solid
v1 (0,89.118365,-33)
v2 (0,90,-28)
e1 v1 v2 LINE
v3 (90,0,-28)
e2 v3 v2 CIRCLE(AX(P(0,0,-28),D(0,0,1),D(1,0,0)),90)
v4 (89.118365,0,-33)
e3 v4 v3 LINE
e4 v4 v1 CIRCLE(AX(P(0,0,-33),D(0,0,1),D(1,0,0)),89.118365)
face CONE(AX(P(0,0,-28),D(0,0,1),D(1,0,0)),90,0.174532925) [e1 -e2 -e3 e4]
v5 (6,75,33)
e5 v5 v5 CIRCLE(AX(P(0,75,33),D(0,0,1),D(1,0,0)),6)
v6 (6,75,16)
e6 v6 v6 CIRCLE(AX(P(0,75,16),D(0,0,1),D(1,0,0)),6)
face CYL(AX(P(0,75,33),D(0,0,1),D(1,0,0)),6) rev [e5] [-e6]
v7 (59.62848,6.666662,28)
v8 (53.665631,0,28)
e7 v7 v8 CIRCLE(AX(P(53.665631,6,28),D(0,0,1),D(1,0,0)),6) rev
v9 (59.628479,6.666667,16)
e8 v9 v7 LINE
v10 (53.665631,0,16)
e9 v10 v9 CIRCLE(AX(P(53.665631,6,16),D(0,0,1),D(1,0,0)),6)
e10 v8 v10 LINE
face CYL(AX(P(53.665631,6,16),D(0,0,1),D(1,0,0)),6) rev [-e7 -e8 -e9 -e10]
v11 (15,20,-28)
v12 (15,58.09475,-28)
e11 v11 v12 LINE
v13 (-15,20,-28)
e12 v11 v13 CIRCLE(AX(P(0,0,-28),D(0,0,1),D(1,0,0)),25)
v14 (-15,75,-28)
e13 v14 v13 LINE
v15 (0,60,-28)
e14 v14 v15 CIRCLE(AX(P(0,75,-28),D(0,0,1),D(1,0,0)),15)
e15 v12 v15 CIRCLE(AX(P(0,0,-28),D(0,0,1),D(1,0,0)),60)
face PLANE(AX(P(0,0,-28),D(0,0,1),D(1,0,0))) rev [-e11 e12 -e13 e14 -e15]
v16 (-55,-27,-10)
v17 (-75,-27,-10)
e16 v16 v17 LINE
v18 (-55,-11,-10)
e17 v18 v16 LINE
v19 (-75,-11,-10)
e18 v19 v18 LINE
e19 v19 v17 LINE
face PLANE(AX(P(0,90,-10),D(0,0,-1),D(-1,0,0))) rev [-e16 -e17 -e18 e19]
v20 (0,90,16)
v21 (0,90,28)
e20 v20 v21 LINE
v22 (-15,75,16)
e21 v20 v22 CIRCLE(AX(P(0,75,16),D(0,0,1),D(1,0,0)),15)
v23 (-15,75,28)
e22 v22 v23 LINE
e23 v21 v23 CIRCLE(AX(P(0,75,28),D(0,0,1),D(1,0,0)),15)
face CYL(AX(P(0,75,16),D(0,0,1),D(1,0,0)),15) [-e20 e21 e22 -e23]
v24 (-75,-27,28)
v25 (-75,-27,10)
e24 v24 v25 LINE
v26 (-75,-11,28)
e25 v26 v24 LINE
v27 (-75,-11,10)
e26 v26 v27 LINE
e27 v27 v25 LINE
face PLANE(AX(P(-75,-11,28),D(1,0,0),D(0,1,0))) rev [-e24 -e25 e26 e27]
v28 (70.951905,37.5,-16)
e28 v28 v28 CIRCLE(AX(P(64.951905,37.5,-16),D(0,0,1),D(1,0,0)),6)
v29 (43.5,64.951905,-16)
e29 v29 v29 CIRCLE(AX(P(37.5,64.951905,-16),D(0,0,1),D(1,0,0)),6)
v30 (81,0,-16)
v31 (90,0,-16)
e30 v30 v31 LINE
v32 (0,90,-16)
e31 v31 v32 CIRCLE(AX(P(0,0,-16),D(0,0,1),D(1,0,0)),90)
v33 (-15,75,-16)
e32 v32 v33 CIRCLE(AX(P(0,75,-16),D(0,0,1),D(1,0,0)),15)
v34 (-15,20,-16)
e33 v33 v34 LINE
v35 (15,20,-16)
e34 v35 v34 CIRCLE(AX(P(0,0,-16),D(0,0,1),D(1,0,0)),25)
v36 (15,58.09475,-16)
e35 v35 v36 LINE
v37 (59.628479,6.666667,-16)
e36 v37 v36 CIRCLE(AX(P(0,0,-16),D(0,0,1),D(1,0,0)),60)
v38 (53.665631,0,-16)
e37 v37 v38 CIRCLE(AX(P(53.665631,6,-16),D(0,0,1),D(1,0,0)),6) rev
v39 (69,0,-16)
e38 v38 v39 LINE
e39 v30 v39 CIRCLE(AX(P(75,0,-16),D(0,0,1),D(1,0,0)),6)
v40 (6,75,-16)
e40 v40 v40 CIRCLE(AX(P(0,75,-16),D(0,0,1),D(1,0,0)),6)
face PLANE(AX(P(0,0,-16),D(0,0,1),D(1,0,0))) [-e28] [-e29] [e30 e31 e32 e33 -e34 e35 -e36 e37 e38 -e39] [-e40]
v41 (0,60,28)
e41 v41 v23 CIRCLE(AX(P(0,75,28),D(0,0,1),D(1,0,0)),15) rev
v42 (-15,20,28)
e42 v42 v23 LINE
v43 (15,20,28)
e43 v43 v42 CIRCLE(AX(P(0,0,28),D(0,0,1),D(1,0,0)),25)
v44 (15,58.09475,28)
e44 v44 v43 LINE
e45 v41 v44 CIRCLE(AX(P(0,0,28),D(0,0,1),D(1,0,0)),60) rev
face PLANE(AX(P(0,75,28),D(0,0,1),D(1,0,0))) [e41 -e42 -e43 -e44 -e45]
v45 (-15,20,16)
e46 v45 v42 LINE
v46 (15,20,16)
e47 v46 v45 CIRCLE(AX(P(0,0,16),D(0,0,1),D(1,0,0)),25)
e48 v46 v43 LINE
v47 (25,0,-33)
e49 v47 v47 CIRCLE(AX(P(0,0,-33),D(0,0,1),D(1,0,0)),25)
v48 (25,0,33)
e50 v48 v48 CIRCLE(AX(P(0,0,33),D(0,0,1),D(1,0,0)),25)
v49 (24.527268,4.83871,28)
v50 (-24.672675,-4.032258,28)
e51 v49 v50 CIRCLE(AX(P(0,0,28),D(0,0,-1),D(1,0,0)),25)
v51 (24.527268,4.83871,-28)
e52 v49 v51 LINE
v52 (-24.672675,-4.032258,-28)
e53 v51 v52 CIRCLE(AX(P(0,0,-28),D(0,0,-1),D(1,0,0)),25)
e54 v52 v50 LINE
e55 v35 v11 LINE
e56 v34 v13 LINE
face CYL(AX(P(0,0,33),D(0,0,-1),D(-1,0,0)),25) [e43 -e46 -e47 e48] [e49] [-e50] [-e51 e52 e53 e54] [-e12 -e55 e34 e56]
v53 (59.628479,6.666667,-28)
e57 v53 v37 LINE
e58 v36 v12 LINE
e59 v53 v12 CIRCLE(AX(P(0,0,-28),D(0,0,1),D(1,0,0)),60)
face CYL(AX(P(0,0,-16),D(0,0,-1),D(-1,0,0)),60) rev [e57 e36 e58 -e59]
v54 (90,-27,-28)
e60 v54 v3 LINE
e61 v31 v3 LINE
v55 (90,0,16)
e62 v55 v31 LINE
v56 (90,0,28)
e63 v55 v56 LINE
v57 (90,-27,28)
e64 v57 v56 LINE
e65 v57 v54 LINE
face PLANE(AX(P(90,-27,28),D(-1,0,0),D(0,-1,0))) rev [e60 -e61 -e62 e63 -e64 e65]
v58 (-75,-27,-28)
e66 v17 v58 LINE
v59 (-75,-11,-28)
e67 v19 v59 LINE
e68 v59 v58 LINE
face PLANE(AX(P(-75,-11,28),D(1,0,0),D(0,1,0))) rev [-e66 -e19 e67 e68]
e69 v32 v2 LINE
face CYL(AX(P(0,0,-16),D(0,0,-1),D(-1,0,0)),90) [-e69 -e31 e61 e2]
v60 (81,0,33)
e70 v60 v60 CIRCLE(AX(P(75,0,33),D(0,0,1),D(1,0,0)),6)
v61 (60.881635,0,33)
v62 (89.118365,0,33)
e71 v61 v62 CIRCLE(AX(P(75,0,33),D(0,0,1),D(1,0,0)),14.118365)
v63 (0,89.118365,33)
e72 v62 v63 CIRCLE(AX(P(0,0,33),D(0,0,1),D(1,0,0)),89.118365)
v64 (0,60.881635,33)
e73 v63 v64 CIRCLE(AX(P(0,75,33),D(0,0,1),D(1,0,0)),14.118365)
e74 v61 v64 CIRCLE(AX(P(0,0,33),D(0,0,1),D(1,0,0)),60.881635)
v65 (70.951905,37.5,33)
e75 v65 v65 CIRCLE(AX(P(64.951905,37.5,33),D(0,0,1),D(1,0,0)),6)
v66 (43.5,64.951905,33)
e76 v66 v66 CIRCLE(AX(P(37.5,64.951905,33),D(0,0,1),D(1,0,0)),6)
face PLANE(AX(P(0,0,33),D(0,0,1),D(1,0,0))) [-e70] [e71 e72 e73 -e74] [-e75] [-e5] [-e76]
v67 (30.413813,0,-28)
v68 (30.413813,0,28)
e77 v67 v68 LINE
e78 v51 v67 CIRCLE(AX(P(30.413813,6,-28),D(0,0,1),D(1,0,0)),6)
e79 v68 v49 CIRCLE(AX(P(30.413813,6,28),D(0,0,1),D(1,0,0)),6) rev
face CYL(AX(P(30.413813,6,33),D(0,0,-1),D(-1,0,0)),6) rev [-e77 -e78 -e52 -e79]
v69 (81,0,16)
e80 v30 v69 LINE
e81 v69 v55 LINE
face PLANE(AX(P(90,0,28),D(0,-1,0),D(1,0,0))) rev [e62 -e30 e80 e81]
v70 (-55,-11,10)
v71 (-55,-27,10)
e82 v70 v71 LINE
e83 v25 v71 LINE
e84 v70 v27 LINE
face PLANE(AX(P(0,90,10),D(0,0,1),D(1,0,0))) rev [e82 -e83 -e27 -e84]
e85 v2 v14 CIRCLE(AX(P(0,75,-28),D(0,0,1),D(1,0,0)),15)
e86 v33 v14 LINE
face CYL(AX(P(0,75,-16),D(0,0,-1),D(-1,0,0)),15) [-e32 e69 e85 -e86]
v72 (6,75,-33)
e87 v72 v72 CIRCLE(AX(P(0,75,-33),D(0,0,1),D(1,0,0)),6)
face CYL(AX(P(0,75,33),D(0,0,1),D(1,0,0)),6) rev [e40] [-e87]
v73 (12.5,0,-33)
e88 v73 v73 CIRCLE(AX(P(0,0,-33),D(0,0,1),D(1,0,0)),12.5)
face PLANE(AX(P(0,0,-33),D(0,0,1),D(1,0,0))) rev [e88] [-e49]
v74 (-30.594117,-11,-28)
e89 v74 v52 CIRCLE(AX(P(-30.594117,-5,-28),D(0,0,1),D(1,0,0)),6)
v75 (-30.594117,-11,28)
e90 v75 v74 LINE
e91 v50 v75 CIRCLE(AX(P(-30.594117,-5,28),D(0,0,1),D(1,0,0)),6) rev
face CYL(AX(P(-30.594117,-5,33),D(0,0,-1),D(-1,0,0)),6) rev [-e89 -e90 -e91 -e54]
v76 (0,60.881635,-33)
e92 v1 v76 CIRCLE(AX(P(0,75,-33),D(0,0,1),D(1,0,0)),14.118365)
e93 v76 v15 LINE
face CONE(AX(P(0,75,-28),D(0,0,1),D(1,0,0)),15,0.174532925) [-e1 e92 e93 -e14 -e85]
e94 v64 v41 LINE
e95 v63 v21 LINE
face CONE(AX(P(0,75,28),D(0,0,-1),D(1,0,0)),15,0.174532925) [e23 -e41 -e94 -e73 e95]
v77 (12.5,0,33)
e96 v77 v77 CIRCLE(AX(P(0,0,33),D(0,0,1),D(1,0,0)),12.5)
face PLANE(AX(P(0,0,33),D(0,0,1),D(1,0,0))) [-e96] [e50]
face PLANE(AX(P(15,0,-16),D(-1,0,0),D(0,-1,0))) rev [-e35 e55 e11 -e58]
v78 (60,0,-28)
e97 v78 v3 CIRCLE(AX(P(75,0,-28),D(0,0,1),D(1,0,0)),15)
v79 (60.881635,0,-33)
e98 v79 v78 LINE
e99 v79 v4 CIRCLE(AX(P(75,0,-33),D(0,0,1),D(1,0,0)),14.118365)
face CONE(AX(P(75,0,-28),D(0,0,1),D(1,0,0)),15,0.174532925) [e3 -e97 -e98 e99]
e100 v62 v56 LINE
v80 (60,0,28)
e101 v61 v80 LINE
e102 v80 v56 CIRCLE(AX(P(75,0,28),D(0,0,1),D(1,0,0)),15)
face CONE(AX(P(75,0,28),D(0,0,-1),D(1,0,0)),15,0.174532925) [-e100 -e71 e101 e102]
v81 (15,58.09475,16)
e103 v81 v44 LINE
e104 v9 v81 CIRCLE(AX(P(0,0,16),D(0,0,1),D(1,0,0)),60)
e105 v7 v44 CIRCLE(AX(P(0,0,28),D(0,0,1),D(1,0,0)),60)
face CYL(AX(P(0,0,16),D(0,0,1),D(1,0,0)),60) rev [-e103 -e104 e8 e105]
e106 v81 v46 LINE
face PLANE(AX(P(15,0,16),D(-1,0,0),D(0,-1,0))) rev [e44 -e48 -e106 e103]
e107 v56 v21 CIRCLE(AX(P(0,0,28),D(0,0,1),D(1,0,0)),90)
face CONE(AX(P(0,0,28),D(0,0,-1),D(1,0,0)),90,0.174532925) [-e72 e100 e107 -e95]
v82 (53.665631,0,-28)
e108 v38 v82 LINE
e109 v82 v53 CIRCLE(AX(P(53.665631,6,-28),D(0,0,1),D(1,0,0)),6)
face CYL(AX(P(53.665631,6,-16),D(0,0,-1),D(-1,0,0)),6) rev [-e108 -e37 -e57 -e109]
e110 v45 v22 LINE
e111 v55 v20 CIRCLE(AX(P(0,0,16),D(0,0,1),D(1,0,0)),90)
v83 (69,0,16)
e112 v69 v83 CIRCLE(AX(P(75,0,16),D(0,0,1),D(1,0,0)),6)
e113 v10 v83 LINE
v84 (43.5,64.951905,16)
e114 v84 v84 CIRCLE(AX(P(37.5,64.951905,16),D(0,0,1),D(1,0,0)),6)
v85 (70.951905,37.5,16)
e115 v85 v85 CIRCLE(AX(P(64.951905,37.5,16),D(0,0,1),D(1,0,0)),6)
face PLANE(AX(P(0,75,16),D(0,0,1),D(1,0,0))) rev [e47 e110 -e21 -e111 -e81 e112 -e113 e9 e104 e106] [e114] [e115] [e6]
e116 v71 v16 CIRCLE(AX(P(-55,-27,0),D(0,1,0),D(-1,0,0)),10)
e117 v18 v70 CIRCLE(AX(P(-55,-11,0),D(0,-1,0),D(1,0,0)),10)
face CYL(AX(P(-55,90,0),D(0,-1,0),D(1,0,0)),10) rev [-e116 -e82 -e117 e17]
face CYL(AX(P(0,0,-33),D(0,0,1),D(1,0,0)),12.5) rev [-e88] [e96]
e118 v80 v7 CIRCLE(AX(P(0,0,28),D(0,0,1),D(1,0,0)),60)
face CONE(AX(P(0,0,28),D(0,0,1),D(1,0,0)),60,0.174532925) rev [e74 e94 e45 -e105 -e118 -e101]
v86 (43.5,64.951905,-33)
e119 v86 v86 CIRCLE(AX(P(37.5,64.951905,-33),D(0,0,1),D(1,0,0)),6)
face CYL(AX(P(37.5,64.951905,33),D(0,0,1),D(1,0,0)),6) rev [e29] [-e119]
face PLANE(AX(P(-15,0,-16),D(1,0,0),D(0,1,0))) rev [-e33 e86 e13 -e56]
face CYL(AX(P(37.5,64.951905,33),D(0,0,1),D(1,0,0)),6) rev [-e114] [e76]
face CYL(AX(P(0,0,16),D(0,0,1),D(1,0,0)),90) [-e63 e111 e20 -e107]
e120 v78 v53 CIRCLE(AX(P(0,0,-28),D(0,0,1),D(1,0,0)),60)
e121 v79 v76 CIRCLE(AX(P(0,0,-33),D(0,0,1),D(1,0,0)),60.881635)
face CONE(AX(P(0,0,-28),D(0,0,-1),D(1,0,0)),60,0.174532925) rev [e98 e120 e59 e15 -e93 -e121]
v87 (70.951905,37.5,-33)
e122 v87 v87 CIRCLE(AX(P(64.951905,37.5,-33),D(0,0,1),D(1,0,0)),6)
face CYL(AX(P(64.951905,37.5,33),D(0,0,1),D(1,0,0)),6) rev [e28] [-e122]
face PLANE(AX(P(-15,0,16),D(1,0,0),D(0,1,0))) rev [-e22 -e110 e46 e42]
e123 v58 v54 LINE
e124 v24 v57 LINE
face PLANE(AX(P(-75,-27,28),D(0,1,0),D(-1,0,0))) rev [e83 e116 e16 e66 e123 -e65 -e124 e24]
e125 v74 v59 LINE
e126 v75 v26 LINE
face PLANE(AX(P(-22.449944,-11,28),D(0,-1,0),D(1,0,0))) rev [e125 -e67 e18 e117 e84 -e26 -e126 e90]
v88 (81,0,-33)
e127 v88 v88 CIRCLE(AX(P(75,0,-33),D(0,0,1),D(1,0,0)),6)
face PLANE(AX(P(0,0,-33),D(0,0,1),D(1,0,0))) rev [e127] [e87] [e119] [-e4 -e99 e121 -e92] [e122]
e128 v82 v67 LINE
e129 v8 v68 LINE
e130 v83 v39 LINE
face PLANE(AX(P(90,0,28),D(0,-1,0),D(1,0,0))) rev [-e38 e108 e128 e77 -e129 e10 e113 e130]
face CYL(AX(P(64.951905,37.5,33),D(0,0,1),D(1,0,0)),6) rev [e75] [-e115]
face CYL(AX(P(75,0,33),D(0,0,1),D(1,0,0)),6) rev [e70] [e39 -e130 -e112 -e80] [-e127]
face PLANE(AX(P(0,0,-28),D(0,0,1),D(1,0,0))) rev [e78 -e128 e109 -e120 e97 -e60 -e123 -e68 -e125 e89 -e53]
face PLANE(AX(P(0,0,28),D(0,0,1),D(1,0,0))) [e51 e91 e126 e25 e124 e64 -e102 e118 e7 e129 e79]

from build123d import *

# Parameters (mm, degrees)
SKETCH1_R                  = 25
BOSS_EXTRUDE1_DEPTH        = 33
CUT_EXTRUDE1_DEPTH         = 49.363209157
CUT_EXTRUDE1_DEPTH_BACK    = 49.363209157
SKETCH2_R                  = 12.5
BOSS_EXTRUDE2_START        = -28
BOSS_EXTRUDE2_DEPTH        = 5
BOSS_EXTRUDE2_DRAFT        = -10
BOSS_EXTRUDE3_START        = -16
BOSS_EXTRUDE3_DEPTH        = 12
BOSS_EXTRUDE5_START        = 28
BOSS_EXTRUDE5_DEPTH        = 5
BOSS_EXTRUDE5_TAPER        = 10
BOSS_EXTRUDE6_START        = 28
BOSS_EXTRUDE6_DEPTH        = 12
BOSS_EXTRUDE7_DEPTH        = 28
F_12_0_12_DIAMETER_HOLE1_D = 12
CIRPATTERN1_COUNT          = 4
CIRPATTERN1_ANGLE          = 90
CUT_EXTRUDE3_DEPTH         = 140.247980237
CUT_EXTRUDE3_DEPTH_BACK    = 56
FILLET1_R                  = 6


with BuildPart() as part:
    # Sketch1 → Boss-Extrude1 (new, symmetric)
    with BuildSketch(Plane.XY):
        Circle(SKETCH1_R)
    extrude(amount=BOSS_EXTRUDE1_DEPTH, both=True)

    # Sketch2 → Cut-Extrude1 (cut, two sides: drawn at the far end of the back side and taken through both)
    with BuildSketch(Plane.XY.offset(-CUT_EXTRUDE1_DEPTH_BACK)):
        Circle(SKETCH2_R)
    extrude(amount=CUT_EXTRUDE1_DEPTH + CUT_EXTRUDE1_DEPTH_BACK, mode=Mode.SUBTRACT)



with BuildPart() as body_2:
    # Sketch4 → Boss-Extrude2 (with draft: the straight prism first)
    with BuildSketch(Plane.XY.offset(BOSS_EXTRUDE2_START)):
        with BuildLine():
            ThreePointArc((90, 0), (63.639610307, 63.639610307), (0, 90))
            ThreePointArc((0, 90), (-15, 75), (0, 60))
            ThreePointArc((0, 60), (42.426406871, 42.426406871), (60, 0))
            ThreePointArc((60, 0), (75, -15), (90, 0))
        make_face()
    extrude(amount=-BOSS_EXTRUDE2_DEPTH)
    # Boss-Extrude2: the draft: its side faces are tilted about the plane it starts from
    boss_extrude2_sides = [body_2.faces().sort_by_distance(p)[0] for p in [
        (42.426406871, 42.426406871, -30.5),
        (75, -15, -30.5),
        (63.639610307, 63.639610307, -30.5),
        (-15, 75, -30.5),
    ]]
    draft(boss_extrude2_sides, Plane.XY.offset(BOSS_EXTRUDE2_START), BOSS_EXTRUDE2_DRAFT)


with BuildPart() as part_1:
    add(part.part)

    add(body_2.part)  # Boss-Extrude3 merges body 2
    # Sketch4<3> → Boss-Extrude3 (add)
    with BuildSketch(Plane.XY.offset(BOSS_EXTRUDE3_START)):
        with BuildLine():
            Line((15, 20), (15, 58.094750193))
            ThreePointArc((15, 58.094750193), (47.434164903, 36.742346142), (60, 0))
            ThreePointArc((60, 0), (75, -15), (90, 0))
            ThreePointArc((90, 0), (63.639610307, 63.639610307), (0, 90))
            ThreePointArc((0, 90), (-10.606601718, 85.606601718), (-15, 75))
            Line((-15, 75), (-15, 20))
            ThreePointArc((-15, 20), (0, 25), (15, 20))
        make_face()
    extrude(amount=-BOSS_EXTRUDE3_DEPTH)



with BuildPart() as body_2_2:
    # Sketch4<5> → Boss-Extrude5 (new body)
    with BuildSketch(Plane.XY.offset(BOSS_EXTRUDE5_START)):
        with BuildLine():
            ThreePointArc((90, 0), (63.639610307, 63.639610307), (0, 90))
            ThreePointArc((0, 90), (-15, 75), (0, 60))
            ThreePointArc((0, 60), (42.426406871, 42.426406871), (60, 0))
            ThreePointArc((60, 0), (75, -15), (90, 0))
        make_face()
    extrude(amount=BOSS_EXTRUDE5_DEPTH, taper=BOSS_EXTRUDE5_TAPER)


with BuildPart() as part_2:
    add(part_1.part)

    add(body_2_2.part)  # Boss-Extrude6 merges body 2 2
    # Sketch4<8> → Boss-Extrude6 (add)
    with BuildSketch(Plane.XY.offset(BOSS_EXTRUDE6_START)):
        with BuildLine():
            ThreePointArc((90, 0), (63.639610307, 63.639610307), (0, 90))
            ThreePointArc((0, 90), (-15, 75), (0, 60))
            ThreePointArc((0, 60), (42.426406871, 42.426406871), (60, 0))
            ThreePointArc((60, 0), (75, -15), (90, 0))
        make_face()
        with BuildLine():
            ThreePointArc((0, 60), (-10.606601718, 64.393398282), (-15, 75))
            Line((-15, 75), (-15, 20))
            ThreePointArc((-15, 20), (0, 25), (15, 20))
            Line((15, 20), (15, 58.094750193))
            ThreePointArc((15, 58.094750193), (7.560257549, 59.521781776), (0, 60))
        make_face()
    extrude(amount=-BOSS_EXTRUDE6_DEPTH)

    # Sketch10 → Boss-Extrude7 (add, symmetric)
    with BuildSketch(Plane.XY):
        with BuildLine():
            Line((-22.449944321, -11), (-75, -11))
            Line((-75, -11), (-75, -27))
            Line((-75, -27), (90, -27))
            Line((90, -27), (90, 0))
            Line((90, 0), (25, 0))
            ThreePointArc((25, 0), (5.645856533, -24.354143467), (-22.449944321, -11))
        make_face()
    extrude(amount=BOSS_EXTRUDE7_DEPTH, both=True)

    # Ø12.0 (12) Diameter Hole1 (through all)
    with Locations(Plane.XY.offset(33)):
        with Locations((0, 75)):
            f_12_0_12_diameter_hole1 = Hole(F_12_0_12_DIAMETER_HOLE1_D / 2)

    # CirPattern1: Ø12.0 (12) Diameter Hole1 ×4 about axis
    cirpattern1_axis = Axis((0, 0, 0), (0, 0, -1))
    for i in range(1, CIRPATTERN1_COUNT):
        add(f_12_0_12_diameter_hole1.rotate(cirpattern1_axis, i * CIRPATTERN1_ANGLE / (CIRPATTERN1_COUNT - 1)), mode=Mode.SUBTRACT)

    # Sketch11 → Cut-Extrude3 (cut, two sides: drawn at the far end of the back side and taken through both)
    with BuildSketch(Plane(origin=(0, -11, 0), x_dir=(1, 0, 0), z_dir=(0, 1, 0)).offset(-CUT_EXTRUDE3_DEPTH_BACK)):
        with BuildLine():
            Line((-55, 10), (-75, 10))
            Line((-75, 10), (-75, -10))
            Line((-75, -10), (-55, -10))
            ThreePointArc((-55, -10), (-45, 0), (-55, 10))
        make_face()
    extrude(amount=CUT_EXTRUDE3_DEPTH + CUT_EXTRUDE3_DEPTH_BACK, mode=Mode.SUBTRACT)

    # Fillet1
    # the kernel refuses this fillet: 6 mm, written as the material it adds along each edge
    with BuildSketch(Plane(origin=(60, 0, -16), x_dir=(-0.055641755903696445, 0.9984507974857616, 0), z_dir=(0, 0, -1))) as fillet1_piece_1:
        with BuildLine():
            CenterArc((6.343160173, -5.990704785), FILLET1_R, 86.810314896, 96.379370208)
            Line((0.352455388, -6.32455532), (0, 0))
            ThreePointArc((0, 0), (3.338505354, 0.092952151), (6.677010708, 0))
        make_face()
    extrude(amount=12)
    with BuildSketch(Plane(origin=(60, 0, 28), x_dir=(-1, 0, 0), z_dir=(0, 0, -1))) as fillet1_piece_2:
        with BuildLine():
            CenterArc((6.33436854, 6), FILLET1_R, 173.620629792, 96.379370208)
            ThreePointArc((0.3715206, 6.666666667), (0.092952151, 3.338505354), (0, 0))
            Line((0, 0), (6.33436854, 0))
        make_face()
    extrude(amount=12)
    with BuildSketch(Plane(origin=(25, 0, 28), x_dir=(-0.09723494563874313, 0.9952614557726179, 0), z_dir=(0, 0, -1))) as fillet1_piece_3:
        with BuildLine():
            CenterArc((5.445156956, 5.971568735), FILLET1_R, 185.579968436, 78.840063128)
            Line((-0.526411779, 5.388159061), (0, 0))
            ThreePointArc((0, 0), (2.430873641, 0.118463606), (4.861747282, 0))
        make_face()
    extrude(amount=56)
    with BuildSketch(Plane(origin=(-22.449944321, -11, 28), x_dir=(-0.30391401052504813, 0.9526994668868987, 0), z_dir=(0, 0, -1))) as fillet1_piece_4:
        with BuildLine():
            CenterArc((8.191325007, -5.935464984), FILLET1_R, 98.411041025, 99.281799087)
            Line((2.475128206, -7.758949048), (0, 0))
            ThreePointArc((0, 0), (3.656841521, -0.268895898), (7.313683042, 0))
        make_face()
    extrude(amount=56)


solid = part_2.part
